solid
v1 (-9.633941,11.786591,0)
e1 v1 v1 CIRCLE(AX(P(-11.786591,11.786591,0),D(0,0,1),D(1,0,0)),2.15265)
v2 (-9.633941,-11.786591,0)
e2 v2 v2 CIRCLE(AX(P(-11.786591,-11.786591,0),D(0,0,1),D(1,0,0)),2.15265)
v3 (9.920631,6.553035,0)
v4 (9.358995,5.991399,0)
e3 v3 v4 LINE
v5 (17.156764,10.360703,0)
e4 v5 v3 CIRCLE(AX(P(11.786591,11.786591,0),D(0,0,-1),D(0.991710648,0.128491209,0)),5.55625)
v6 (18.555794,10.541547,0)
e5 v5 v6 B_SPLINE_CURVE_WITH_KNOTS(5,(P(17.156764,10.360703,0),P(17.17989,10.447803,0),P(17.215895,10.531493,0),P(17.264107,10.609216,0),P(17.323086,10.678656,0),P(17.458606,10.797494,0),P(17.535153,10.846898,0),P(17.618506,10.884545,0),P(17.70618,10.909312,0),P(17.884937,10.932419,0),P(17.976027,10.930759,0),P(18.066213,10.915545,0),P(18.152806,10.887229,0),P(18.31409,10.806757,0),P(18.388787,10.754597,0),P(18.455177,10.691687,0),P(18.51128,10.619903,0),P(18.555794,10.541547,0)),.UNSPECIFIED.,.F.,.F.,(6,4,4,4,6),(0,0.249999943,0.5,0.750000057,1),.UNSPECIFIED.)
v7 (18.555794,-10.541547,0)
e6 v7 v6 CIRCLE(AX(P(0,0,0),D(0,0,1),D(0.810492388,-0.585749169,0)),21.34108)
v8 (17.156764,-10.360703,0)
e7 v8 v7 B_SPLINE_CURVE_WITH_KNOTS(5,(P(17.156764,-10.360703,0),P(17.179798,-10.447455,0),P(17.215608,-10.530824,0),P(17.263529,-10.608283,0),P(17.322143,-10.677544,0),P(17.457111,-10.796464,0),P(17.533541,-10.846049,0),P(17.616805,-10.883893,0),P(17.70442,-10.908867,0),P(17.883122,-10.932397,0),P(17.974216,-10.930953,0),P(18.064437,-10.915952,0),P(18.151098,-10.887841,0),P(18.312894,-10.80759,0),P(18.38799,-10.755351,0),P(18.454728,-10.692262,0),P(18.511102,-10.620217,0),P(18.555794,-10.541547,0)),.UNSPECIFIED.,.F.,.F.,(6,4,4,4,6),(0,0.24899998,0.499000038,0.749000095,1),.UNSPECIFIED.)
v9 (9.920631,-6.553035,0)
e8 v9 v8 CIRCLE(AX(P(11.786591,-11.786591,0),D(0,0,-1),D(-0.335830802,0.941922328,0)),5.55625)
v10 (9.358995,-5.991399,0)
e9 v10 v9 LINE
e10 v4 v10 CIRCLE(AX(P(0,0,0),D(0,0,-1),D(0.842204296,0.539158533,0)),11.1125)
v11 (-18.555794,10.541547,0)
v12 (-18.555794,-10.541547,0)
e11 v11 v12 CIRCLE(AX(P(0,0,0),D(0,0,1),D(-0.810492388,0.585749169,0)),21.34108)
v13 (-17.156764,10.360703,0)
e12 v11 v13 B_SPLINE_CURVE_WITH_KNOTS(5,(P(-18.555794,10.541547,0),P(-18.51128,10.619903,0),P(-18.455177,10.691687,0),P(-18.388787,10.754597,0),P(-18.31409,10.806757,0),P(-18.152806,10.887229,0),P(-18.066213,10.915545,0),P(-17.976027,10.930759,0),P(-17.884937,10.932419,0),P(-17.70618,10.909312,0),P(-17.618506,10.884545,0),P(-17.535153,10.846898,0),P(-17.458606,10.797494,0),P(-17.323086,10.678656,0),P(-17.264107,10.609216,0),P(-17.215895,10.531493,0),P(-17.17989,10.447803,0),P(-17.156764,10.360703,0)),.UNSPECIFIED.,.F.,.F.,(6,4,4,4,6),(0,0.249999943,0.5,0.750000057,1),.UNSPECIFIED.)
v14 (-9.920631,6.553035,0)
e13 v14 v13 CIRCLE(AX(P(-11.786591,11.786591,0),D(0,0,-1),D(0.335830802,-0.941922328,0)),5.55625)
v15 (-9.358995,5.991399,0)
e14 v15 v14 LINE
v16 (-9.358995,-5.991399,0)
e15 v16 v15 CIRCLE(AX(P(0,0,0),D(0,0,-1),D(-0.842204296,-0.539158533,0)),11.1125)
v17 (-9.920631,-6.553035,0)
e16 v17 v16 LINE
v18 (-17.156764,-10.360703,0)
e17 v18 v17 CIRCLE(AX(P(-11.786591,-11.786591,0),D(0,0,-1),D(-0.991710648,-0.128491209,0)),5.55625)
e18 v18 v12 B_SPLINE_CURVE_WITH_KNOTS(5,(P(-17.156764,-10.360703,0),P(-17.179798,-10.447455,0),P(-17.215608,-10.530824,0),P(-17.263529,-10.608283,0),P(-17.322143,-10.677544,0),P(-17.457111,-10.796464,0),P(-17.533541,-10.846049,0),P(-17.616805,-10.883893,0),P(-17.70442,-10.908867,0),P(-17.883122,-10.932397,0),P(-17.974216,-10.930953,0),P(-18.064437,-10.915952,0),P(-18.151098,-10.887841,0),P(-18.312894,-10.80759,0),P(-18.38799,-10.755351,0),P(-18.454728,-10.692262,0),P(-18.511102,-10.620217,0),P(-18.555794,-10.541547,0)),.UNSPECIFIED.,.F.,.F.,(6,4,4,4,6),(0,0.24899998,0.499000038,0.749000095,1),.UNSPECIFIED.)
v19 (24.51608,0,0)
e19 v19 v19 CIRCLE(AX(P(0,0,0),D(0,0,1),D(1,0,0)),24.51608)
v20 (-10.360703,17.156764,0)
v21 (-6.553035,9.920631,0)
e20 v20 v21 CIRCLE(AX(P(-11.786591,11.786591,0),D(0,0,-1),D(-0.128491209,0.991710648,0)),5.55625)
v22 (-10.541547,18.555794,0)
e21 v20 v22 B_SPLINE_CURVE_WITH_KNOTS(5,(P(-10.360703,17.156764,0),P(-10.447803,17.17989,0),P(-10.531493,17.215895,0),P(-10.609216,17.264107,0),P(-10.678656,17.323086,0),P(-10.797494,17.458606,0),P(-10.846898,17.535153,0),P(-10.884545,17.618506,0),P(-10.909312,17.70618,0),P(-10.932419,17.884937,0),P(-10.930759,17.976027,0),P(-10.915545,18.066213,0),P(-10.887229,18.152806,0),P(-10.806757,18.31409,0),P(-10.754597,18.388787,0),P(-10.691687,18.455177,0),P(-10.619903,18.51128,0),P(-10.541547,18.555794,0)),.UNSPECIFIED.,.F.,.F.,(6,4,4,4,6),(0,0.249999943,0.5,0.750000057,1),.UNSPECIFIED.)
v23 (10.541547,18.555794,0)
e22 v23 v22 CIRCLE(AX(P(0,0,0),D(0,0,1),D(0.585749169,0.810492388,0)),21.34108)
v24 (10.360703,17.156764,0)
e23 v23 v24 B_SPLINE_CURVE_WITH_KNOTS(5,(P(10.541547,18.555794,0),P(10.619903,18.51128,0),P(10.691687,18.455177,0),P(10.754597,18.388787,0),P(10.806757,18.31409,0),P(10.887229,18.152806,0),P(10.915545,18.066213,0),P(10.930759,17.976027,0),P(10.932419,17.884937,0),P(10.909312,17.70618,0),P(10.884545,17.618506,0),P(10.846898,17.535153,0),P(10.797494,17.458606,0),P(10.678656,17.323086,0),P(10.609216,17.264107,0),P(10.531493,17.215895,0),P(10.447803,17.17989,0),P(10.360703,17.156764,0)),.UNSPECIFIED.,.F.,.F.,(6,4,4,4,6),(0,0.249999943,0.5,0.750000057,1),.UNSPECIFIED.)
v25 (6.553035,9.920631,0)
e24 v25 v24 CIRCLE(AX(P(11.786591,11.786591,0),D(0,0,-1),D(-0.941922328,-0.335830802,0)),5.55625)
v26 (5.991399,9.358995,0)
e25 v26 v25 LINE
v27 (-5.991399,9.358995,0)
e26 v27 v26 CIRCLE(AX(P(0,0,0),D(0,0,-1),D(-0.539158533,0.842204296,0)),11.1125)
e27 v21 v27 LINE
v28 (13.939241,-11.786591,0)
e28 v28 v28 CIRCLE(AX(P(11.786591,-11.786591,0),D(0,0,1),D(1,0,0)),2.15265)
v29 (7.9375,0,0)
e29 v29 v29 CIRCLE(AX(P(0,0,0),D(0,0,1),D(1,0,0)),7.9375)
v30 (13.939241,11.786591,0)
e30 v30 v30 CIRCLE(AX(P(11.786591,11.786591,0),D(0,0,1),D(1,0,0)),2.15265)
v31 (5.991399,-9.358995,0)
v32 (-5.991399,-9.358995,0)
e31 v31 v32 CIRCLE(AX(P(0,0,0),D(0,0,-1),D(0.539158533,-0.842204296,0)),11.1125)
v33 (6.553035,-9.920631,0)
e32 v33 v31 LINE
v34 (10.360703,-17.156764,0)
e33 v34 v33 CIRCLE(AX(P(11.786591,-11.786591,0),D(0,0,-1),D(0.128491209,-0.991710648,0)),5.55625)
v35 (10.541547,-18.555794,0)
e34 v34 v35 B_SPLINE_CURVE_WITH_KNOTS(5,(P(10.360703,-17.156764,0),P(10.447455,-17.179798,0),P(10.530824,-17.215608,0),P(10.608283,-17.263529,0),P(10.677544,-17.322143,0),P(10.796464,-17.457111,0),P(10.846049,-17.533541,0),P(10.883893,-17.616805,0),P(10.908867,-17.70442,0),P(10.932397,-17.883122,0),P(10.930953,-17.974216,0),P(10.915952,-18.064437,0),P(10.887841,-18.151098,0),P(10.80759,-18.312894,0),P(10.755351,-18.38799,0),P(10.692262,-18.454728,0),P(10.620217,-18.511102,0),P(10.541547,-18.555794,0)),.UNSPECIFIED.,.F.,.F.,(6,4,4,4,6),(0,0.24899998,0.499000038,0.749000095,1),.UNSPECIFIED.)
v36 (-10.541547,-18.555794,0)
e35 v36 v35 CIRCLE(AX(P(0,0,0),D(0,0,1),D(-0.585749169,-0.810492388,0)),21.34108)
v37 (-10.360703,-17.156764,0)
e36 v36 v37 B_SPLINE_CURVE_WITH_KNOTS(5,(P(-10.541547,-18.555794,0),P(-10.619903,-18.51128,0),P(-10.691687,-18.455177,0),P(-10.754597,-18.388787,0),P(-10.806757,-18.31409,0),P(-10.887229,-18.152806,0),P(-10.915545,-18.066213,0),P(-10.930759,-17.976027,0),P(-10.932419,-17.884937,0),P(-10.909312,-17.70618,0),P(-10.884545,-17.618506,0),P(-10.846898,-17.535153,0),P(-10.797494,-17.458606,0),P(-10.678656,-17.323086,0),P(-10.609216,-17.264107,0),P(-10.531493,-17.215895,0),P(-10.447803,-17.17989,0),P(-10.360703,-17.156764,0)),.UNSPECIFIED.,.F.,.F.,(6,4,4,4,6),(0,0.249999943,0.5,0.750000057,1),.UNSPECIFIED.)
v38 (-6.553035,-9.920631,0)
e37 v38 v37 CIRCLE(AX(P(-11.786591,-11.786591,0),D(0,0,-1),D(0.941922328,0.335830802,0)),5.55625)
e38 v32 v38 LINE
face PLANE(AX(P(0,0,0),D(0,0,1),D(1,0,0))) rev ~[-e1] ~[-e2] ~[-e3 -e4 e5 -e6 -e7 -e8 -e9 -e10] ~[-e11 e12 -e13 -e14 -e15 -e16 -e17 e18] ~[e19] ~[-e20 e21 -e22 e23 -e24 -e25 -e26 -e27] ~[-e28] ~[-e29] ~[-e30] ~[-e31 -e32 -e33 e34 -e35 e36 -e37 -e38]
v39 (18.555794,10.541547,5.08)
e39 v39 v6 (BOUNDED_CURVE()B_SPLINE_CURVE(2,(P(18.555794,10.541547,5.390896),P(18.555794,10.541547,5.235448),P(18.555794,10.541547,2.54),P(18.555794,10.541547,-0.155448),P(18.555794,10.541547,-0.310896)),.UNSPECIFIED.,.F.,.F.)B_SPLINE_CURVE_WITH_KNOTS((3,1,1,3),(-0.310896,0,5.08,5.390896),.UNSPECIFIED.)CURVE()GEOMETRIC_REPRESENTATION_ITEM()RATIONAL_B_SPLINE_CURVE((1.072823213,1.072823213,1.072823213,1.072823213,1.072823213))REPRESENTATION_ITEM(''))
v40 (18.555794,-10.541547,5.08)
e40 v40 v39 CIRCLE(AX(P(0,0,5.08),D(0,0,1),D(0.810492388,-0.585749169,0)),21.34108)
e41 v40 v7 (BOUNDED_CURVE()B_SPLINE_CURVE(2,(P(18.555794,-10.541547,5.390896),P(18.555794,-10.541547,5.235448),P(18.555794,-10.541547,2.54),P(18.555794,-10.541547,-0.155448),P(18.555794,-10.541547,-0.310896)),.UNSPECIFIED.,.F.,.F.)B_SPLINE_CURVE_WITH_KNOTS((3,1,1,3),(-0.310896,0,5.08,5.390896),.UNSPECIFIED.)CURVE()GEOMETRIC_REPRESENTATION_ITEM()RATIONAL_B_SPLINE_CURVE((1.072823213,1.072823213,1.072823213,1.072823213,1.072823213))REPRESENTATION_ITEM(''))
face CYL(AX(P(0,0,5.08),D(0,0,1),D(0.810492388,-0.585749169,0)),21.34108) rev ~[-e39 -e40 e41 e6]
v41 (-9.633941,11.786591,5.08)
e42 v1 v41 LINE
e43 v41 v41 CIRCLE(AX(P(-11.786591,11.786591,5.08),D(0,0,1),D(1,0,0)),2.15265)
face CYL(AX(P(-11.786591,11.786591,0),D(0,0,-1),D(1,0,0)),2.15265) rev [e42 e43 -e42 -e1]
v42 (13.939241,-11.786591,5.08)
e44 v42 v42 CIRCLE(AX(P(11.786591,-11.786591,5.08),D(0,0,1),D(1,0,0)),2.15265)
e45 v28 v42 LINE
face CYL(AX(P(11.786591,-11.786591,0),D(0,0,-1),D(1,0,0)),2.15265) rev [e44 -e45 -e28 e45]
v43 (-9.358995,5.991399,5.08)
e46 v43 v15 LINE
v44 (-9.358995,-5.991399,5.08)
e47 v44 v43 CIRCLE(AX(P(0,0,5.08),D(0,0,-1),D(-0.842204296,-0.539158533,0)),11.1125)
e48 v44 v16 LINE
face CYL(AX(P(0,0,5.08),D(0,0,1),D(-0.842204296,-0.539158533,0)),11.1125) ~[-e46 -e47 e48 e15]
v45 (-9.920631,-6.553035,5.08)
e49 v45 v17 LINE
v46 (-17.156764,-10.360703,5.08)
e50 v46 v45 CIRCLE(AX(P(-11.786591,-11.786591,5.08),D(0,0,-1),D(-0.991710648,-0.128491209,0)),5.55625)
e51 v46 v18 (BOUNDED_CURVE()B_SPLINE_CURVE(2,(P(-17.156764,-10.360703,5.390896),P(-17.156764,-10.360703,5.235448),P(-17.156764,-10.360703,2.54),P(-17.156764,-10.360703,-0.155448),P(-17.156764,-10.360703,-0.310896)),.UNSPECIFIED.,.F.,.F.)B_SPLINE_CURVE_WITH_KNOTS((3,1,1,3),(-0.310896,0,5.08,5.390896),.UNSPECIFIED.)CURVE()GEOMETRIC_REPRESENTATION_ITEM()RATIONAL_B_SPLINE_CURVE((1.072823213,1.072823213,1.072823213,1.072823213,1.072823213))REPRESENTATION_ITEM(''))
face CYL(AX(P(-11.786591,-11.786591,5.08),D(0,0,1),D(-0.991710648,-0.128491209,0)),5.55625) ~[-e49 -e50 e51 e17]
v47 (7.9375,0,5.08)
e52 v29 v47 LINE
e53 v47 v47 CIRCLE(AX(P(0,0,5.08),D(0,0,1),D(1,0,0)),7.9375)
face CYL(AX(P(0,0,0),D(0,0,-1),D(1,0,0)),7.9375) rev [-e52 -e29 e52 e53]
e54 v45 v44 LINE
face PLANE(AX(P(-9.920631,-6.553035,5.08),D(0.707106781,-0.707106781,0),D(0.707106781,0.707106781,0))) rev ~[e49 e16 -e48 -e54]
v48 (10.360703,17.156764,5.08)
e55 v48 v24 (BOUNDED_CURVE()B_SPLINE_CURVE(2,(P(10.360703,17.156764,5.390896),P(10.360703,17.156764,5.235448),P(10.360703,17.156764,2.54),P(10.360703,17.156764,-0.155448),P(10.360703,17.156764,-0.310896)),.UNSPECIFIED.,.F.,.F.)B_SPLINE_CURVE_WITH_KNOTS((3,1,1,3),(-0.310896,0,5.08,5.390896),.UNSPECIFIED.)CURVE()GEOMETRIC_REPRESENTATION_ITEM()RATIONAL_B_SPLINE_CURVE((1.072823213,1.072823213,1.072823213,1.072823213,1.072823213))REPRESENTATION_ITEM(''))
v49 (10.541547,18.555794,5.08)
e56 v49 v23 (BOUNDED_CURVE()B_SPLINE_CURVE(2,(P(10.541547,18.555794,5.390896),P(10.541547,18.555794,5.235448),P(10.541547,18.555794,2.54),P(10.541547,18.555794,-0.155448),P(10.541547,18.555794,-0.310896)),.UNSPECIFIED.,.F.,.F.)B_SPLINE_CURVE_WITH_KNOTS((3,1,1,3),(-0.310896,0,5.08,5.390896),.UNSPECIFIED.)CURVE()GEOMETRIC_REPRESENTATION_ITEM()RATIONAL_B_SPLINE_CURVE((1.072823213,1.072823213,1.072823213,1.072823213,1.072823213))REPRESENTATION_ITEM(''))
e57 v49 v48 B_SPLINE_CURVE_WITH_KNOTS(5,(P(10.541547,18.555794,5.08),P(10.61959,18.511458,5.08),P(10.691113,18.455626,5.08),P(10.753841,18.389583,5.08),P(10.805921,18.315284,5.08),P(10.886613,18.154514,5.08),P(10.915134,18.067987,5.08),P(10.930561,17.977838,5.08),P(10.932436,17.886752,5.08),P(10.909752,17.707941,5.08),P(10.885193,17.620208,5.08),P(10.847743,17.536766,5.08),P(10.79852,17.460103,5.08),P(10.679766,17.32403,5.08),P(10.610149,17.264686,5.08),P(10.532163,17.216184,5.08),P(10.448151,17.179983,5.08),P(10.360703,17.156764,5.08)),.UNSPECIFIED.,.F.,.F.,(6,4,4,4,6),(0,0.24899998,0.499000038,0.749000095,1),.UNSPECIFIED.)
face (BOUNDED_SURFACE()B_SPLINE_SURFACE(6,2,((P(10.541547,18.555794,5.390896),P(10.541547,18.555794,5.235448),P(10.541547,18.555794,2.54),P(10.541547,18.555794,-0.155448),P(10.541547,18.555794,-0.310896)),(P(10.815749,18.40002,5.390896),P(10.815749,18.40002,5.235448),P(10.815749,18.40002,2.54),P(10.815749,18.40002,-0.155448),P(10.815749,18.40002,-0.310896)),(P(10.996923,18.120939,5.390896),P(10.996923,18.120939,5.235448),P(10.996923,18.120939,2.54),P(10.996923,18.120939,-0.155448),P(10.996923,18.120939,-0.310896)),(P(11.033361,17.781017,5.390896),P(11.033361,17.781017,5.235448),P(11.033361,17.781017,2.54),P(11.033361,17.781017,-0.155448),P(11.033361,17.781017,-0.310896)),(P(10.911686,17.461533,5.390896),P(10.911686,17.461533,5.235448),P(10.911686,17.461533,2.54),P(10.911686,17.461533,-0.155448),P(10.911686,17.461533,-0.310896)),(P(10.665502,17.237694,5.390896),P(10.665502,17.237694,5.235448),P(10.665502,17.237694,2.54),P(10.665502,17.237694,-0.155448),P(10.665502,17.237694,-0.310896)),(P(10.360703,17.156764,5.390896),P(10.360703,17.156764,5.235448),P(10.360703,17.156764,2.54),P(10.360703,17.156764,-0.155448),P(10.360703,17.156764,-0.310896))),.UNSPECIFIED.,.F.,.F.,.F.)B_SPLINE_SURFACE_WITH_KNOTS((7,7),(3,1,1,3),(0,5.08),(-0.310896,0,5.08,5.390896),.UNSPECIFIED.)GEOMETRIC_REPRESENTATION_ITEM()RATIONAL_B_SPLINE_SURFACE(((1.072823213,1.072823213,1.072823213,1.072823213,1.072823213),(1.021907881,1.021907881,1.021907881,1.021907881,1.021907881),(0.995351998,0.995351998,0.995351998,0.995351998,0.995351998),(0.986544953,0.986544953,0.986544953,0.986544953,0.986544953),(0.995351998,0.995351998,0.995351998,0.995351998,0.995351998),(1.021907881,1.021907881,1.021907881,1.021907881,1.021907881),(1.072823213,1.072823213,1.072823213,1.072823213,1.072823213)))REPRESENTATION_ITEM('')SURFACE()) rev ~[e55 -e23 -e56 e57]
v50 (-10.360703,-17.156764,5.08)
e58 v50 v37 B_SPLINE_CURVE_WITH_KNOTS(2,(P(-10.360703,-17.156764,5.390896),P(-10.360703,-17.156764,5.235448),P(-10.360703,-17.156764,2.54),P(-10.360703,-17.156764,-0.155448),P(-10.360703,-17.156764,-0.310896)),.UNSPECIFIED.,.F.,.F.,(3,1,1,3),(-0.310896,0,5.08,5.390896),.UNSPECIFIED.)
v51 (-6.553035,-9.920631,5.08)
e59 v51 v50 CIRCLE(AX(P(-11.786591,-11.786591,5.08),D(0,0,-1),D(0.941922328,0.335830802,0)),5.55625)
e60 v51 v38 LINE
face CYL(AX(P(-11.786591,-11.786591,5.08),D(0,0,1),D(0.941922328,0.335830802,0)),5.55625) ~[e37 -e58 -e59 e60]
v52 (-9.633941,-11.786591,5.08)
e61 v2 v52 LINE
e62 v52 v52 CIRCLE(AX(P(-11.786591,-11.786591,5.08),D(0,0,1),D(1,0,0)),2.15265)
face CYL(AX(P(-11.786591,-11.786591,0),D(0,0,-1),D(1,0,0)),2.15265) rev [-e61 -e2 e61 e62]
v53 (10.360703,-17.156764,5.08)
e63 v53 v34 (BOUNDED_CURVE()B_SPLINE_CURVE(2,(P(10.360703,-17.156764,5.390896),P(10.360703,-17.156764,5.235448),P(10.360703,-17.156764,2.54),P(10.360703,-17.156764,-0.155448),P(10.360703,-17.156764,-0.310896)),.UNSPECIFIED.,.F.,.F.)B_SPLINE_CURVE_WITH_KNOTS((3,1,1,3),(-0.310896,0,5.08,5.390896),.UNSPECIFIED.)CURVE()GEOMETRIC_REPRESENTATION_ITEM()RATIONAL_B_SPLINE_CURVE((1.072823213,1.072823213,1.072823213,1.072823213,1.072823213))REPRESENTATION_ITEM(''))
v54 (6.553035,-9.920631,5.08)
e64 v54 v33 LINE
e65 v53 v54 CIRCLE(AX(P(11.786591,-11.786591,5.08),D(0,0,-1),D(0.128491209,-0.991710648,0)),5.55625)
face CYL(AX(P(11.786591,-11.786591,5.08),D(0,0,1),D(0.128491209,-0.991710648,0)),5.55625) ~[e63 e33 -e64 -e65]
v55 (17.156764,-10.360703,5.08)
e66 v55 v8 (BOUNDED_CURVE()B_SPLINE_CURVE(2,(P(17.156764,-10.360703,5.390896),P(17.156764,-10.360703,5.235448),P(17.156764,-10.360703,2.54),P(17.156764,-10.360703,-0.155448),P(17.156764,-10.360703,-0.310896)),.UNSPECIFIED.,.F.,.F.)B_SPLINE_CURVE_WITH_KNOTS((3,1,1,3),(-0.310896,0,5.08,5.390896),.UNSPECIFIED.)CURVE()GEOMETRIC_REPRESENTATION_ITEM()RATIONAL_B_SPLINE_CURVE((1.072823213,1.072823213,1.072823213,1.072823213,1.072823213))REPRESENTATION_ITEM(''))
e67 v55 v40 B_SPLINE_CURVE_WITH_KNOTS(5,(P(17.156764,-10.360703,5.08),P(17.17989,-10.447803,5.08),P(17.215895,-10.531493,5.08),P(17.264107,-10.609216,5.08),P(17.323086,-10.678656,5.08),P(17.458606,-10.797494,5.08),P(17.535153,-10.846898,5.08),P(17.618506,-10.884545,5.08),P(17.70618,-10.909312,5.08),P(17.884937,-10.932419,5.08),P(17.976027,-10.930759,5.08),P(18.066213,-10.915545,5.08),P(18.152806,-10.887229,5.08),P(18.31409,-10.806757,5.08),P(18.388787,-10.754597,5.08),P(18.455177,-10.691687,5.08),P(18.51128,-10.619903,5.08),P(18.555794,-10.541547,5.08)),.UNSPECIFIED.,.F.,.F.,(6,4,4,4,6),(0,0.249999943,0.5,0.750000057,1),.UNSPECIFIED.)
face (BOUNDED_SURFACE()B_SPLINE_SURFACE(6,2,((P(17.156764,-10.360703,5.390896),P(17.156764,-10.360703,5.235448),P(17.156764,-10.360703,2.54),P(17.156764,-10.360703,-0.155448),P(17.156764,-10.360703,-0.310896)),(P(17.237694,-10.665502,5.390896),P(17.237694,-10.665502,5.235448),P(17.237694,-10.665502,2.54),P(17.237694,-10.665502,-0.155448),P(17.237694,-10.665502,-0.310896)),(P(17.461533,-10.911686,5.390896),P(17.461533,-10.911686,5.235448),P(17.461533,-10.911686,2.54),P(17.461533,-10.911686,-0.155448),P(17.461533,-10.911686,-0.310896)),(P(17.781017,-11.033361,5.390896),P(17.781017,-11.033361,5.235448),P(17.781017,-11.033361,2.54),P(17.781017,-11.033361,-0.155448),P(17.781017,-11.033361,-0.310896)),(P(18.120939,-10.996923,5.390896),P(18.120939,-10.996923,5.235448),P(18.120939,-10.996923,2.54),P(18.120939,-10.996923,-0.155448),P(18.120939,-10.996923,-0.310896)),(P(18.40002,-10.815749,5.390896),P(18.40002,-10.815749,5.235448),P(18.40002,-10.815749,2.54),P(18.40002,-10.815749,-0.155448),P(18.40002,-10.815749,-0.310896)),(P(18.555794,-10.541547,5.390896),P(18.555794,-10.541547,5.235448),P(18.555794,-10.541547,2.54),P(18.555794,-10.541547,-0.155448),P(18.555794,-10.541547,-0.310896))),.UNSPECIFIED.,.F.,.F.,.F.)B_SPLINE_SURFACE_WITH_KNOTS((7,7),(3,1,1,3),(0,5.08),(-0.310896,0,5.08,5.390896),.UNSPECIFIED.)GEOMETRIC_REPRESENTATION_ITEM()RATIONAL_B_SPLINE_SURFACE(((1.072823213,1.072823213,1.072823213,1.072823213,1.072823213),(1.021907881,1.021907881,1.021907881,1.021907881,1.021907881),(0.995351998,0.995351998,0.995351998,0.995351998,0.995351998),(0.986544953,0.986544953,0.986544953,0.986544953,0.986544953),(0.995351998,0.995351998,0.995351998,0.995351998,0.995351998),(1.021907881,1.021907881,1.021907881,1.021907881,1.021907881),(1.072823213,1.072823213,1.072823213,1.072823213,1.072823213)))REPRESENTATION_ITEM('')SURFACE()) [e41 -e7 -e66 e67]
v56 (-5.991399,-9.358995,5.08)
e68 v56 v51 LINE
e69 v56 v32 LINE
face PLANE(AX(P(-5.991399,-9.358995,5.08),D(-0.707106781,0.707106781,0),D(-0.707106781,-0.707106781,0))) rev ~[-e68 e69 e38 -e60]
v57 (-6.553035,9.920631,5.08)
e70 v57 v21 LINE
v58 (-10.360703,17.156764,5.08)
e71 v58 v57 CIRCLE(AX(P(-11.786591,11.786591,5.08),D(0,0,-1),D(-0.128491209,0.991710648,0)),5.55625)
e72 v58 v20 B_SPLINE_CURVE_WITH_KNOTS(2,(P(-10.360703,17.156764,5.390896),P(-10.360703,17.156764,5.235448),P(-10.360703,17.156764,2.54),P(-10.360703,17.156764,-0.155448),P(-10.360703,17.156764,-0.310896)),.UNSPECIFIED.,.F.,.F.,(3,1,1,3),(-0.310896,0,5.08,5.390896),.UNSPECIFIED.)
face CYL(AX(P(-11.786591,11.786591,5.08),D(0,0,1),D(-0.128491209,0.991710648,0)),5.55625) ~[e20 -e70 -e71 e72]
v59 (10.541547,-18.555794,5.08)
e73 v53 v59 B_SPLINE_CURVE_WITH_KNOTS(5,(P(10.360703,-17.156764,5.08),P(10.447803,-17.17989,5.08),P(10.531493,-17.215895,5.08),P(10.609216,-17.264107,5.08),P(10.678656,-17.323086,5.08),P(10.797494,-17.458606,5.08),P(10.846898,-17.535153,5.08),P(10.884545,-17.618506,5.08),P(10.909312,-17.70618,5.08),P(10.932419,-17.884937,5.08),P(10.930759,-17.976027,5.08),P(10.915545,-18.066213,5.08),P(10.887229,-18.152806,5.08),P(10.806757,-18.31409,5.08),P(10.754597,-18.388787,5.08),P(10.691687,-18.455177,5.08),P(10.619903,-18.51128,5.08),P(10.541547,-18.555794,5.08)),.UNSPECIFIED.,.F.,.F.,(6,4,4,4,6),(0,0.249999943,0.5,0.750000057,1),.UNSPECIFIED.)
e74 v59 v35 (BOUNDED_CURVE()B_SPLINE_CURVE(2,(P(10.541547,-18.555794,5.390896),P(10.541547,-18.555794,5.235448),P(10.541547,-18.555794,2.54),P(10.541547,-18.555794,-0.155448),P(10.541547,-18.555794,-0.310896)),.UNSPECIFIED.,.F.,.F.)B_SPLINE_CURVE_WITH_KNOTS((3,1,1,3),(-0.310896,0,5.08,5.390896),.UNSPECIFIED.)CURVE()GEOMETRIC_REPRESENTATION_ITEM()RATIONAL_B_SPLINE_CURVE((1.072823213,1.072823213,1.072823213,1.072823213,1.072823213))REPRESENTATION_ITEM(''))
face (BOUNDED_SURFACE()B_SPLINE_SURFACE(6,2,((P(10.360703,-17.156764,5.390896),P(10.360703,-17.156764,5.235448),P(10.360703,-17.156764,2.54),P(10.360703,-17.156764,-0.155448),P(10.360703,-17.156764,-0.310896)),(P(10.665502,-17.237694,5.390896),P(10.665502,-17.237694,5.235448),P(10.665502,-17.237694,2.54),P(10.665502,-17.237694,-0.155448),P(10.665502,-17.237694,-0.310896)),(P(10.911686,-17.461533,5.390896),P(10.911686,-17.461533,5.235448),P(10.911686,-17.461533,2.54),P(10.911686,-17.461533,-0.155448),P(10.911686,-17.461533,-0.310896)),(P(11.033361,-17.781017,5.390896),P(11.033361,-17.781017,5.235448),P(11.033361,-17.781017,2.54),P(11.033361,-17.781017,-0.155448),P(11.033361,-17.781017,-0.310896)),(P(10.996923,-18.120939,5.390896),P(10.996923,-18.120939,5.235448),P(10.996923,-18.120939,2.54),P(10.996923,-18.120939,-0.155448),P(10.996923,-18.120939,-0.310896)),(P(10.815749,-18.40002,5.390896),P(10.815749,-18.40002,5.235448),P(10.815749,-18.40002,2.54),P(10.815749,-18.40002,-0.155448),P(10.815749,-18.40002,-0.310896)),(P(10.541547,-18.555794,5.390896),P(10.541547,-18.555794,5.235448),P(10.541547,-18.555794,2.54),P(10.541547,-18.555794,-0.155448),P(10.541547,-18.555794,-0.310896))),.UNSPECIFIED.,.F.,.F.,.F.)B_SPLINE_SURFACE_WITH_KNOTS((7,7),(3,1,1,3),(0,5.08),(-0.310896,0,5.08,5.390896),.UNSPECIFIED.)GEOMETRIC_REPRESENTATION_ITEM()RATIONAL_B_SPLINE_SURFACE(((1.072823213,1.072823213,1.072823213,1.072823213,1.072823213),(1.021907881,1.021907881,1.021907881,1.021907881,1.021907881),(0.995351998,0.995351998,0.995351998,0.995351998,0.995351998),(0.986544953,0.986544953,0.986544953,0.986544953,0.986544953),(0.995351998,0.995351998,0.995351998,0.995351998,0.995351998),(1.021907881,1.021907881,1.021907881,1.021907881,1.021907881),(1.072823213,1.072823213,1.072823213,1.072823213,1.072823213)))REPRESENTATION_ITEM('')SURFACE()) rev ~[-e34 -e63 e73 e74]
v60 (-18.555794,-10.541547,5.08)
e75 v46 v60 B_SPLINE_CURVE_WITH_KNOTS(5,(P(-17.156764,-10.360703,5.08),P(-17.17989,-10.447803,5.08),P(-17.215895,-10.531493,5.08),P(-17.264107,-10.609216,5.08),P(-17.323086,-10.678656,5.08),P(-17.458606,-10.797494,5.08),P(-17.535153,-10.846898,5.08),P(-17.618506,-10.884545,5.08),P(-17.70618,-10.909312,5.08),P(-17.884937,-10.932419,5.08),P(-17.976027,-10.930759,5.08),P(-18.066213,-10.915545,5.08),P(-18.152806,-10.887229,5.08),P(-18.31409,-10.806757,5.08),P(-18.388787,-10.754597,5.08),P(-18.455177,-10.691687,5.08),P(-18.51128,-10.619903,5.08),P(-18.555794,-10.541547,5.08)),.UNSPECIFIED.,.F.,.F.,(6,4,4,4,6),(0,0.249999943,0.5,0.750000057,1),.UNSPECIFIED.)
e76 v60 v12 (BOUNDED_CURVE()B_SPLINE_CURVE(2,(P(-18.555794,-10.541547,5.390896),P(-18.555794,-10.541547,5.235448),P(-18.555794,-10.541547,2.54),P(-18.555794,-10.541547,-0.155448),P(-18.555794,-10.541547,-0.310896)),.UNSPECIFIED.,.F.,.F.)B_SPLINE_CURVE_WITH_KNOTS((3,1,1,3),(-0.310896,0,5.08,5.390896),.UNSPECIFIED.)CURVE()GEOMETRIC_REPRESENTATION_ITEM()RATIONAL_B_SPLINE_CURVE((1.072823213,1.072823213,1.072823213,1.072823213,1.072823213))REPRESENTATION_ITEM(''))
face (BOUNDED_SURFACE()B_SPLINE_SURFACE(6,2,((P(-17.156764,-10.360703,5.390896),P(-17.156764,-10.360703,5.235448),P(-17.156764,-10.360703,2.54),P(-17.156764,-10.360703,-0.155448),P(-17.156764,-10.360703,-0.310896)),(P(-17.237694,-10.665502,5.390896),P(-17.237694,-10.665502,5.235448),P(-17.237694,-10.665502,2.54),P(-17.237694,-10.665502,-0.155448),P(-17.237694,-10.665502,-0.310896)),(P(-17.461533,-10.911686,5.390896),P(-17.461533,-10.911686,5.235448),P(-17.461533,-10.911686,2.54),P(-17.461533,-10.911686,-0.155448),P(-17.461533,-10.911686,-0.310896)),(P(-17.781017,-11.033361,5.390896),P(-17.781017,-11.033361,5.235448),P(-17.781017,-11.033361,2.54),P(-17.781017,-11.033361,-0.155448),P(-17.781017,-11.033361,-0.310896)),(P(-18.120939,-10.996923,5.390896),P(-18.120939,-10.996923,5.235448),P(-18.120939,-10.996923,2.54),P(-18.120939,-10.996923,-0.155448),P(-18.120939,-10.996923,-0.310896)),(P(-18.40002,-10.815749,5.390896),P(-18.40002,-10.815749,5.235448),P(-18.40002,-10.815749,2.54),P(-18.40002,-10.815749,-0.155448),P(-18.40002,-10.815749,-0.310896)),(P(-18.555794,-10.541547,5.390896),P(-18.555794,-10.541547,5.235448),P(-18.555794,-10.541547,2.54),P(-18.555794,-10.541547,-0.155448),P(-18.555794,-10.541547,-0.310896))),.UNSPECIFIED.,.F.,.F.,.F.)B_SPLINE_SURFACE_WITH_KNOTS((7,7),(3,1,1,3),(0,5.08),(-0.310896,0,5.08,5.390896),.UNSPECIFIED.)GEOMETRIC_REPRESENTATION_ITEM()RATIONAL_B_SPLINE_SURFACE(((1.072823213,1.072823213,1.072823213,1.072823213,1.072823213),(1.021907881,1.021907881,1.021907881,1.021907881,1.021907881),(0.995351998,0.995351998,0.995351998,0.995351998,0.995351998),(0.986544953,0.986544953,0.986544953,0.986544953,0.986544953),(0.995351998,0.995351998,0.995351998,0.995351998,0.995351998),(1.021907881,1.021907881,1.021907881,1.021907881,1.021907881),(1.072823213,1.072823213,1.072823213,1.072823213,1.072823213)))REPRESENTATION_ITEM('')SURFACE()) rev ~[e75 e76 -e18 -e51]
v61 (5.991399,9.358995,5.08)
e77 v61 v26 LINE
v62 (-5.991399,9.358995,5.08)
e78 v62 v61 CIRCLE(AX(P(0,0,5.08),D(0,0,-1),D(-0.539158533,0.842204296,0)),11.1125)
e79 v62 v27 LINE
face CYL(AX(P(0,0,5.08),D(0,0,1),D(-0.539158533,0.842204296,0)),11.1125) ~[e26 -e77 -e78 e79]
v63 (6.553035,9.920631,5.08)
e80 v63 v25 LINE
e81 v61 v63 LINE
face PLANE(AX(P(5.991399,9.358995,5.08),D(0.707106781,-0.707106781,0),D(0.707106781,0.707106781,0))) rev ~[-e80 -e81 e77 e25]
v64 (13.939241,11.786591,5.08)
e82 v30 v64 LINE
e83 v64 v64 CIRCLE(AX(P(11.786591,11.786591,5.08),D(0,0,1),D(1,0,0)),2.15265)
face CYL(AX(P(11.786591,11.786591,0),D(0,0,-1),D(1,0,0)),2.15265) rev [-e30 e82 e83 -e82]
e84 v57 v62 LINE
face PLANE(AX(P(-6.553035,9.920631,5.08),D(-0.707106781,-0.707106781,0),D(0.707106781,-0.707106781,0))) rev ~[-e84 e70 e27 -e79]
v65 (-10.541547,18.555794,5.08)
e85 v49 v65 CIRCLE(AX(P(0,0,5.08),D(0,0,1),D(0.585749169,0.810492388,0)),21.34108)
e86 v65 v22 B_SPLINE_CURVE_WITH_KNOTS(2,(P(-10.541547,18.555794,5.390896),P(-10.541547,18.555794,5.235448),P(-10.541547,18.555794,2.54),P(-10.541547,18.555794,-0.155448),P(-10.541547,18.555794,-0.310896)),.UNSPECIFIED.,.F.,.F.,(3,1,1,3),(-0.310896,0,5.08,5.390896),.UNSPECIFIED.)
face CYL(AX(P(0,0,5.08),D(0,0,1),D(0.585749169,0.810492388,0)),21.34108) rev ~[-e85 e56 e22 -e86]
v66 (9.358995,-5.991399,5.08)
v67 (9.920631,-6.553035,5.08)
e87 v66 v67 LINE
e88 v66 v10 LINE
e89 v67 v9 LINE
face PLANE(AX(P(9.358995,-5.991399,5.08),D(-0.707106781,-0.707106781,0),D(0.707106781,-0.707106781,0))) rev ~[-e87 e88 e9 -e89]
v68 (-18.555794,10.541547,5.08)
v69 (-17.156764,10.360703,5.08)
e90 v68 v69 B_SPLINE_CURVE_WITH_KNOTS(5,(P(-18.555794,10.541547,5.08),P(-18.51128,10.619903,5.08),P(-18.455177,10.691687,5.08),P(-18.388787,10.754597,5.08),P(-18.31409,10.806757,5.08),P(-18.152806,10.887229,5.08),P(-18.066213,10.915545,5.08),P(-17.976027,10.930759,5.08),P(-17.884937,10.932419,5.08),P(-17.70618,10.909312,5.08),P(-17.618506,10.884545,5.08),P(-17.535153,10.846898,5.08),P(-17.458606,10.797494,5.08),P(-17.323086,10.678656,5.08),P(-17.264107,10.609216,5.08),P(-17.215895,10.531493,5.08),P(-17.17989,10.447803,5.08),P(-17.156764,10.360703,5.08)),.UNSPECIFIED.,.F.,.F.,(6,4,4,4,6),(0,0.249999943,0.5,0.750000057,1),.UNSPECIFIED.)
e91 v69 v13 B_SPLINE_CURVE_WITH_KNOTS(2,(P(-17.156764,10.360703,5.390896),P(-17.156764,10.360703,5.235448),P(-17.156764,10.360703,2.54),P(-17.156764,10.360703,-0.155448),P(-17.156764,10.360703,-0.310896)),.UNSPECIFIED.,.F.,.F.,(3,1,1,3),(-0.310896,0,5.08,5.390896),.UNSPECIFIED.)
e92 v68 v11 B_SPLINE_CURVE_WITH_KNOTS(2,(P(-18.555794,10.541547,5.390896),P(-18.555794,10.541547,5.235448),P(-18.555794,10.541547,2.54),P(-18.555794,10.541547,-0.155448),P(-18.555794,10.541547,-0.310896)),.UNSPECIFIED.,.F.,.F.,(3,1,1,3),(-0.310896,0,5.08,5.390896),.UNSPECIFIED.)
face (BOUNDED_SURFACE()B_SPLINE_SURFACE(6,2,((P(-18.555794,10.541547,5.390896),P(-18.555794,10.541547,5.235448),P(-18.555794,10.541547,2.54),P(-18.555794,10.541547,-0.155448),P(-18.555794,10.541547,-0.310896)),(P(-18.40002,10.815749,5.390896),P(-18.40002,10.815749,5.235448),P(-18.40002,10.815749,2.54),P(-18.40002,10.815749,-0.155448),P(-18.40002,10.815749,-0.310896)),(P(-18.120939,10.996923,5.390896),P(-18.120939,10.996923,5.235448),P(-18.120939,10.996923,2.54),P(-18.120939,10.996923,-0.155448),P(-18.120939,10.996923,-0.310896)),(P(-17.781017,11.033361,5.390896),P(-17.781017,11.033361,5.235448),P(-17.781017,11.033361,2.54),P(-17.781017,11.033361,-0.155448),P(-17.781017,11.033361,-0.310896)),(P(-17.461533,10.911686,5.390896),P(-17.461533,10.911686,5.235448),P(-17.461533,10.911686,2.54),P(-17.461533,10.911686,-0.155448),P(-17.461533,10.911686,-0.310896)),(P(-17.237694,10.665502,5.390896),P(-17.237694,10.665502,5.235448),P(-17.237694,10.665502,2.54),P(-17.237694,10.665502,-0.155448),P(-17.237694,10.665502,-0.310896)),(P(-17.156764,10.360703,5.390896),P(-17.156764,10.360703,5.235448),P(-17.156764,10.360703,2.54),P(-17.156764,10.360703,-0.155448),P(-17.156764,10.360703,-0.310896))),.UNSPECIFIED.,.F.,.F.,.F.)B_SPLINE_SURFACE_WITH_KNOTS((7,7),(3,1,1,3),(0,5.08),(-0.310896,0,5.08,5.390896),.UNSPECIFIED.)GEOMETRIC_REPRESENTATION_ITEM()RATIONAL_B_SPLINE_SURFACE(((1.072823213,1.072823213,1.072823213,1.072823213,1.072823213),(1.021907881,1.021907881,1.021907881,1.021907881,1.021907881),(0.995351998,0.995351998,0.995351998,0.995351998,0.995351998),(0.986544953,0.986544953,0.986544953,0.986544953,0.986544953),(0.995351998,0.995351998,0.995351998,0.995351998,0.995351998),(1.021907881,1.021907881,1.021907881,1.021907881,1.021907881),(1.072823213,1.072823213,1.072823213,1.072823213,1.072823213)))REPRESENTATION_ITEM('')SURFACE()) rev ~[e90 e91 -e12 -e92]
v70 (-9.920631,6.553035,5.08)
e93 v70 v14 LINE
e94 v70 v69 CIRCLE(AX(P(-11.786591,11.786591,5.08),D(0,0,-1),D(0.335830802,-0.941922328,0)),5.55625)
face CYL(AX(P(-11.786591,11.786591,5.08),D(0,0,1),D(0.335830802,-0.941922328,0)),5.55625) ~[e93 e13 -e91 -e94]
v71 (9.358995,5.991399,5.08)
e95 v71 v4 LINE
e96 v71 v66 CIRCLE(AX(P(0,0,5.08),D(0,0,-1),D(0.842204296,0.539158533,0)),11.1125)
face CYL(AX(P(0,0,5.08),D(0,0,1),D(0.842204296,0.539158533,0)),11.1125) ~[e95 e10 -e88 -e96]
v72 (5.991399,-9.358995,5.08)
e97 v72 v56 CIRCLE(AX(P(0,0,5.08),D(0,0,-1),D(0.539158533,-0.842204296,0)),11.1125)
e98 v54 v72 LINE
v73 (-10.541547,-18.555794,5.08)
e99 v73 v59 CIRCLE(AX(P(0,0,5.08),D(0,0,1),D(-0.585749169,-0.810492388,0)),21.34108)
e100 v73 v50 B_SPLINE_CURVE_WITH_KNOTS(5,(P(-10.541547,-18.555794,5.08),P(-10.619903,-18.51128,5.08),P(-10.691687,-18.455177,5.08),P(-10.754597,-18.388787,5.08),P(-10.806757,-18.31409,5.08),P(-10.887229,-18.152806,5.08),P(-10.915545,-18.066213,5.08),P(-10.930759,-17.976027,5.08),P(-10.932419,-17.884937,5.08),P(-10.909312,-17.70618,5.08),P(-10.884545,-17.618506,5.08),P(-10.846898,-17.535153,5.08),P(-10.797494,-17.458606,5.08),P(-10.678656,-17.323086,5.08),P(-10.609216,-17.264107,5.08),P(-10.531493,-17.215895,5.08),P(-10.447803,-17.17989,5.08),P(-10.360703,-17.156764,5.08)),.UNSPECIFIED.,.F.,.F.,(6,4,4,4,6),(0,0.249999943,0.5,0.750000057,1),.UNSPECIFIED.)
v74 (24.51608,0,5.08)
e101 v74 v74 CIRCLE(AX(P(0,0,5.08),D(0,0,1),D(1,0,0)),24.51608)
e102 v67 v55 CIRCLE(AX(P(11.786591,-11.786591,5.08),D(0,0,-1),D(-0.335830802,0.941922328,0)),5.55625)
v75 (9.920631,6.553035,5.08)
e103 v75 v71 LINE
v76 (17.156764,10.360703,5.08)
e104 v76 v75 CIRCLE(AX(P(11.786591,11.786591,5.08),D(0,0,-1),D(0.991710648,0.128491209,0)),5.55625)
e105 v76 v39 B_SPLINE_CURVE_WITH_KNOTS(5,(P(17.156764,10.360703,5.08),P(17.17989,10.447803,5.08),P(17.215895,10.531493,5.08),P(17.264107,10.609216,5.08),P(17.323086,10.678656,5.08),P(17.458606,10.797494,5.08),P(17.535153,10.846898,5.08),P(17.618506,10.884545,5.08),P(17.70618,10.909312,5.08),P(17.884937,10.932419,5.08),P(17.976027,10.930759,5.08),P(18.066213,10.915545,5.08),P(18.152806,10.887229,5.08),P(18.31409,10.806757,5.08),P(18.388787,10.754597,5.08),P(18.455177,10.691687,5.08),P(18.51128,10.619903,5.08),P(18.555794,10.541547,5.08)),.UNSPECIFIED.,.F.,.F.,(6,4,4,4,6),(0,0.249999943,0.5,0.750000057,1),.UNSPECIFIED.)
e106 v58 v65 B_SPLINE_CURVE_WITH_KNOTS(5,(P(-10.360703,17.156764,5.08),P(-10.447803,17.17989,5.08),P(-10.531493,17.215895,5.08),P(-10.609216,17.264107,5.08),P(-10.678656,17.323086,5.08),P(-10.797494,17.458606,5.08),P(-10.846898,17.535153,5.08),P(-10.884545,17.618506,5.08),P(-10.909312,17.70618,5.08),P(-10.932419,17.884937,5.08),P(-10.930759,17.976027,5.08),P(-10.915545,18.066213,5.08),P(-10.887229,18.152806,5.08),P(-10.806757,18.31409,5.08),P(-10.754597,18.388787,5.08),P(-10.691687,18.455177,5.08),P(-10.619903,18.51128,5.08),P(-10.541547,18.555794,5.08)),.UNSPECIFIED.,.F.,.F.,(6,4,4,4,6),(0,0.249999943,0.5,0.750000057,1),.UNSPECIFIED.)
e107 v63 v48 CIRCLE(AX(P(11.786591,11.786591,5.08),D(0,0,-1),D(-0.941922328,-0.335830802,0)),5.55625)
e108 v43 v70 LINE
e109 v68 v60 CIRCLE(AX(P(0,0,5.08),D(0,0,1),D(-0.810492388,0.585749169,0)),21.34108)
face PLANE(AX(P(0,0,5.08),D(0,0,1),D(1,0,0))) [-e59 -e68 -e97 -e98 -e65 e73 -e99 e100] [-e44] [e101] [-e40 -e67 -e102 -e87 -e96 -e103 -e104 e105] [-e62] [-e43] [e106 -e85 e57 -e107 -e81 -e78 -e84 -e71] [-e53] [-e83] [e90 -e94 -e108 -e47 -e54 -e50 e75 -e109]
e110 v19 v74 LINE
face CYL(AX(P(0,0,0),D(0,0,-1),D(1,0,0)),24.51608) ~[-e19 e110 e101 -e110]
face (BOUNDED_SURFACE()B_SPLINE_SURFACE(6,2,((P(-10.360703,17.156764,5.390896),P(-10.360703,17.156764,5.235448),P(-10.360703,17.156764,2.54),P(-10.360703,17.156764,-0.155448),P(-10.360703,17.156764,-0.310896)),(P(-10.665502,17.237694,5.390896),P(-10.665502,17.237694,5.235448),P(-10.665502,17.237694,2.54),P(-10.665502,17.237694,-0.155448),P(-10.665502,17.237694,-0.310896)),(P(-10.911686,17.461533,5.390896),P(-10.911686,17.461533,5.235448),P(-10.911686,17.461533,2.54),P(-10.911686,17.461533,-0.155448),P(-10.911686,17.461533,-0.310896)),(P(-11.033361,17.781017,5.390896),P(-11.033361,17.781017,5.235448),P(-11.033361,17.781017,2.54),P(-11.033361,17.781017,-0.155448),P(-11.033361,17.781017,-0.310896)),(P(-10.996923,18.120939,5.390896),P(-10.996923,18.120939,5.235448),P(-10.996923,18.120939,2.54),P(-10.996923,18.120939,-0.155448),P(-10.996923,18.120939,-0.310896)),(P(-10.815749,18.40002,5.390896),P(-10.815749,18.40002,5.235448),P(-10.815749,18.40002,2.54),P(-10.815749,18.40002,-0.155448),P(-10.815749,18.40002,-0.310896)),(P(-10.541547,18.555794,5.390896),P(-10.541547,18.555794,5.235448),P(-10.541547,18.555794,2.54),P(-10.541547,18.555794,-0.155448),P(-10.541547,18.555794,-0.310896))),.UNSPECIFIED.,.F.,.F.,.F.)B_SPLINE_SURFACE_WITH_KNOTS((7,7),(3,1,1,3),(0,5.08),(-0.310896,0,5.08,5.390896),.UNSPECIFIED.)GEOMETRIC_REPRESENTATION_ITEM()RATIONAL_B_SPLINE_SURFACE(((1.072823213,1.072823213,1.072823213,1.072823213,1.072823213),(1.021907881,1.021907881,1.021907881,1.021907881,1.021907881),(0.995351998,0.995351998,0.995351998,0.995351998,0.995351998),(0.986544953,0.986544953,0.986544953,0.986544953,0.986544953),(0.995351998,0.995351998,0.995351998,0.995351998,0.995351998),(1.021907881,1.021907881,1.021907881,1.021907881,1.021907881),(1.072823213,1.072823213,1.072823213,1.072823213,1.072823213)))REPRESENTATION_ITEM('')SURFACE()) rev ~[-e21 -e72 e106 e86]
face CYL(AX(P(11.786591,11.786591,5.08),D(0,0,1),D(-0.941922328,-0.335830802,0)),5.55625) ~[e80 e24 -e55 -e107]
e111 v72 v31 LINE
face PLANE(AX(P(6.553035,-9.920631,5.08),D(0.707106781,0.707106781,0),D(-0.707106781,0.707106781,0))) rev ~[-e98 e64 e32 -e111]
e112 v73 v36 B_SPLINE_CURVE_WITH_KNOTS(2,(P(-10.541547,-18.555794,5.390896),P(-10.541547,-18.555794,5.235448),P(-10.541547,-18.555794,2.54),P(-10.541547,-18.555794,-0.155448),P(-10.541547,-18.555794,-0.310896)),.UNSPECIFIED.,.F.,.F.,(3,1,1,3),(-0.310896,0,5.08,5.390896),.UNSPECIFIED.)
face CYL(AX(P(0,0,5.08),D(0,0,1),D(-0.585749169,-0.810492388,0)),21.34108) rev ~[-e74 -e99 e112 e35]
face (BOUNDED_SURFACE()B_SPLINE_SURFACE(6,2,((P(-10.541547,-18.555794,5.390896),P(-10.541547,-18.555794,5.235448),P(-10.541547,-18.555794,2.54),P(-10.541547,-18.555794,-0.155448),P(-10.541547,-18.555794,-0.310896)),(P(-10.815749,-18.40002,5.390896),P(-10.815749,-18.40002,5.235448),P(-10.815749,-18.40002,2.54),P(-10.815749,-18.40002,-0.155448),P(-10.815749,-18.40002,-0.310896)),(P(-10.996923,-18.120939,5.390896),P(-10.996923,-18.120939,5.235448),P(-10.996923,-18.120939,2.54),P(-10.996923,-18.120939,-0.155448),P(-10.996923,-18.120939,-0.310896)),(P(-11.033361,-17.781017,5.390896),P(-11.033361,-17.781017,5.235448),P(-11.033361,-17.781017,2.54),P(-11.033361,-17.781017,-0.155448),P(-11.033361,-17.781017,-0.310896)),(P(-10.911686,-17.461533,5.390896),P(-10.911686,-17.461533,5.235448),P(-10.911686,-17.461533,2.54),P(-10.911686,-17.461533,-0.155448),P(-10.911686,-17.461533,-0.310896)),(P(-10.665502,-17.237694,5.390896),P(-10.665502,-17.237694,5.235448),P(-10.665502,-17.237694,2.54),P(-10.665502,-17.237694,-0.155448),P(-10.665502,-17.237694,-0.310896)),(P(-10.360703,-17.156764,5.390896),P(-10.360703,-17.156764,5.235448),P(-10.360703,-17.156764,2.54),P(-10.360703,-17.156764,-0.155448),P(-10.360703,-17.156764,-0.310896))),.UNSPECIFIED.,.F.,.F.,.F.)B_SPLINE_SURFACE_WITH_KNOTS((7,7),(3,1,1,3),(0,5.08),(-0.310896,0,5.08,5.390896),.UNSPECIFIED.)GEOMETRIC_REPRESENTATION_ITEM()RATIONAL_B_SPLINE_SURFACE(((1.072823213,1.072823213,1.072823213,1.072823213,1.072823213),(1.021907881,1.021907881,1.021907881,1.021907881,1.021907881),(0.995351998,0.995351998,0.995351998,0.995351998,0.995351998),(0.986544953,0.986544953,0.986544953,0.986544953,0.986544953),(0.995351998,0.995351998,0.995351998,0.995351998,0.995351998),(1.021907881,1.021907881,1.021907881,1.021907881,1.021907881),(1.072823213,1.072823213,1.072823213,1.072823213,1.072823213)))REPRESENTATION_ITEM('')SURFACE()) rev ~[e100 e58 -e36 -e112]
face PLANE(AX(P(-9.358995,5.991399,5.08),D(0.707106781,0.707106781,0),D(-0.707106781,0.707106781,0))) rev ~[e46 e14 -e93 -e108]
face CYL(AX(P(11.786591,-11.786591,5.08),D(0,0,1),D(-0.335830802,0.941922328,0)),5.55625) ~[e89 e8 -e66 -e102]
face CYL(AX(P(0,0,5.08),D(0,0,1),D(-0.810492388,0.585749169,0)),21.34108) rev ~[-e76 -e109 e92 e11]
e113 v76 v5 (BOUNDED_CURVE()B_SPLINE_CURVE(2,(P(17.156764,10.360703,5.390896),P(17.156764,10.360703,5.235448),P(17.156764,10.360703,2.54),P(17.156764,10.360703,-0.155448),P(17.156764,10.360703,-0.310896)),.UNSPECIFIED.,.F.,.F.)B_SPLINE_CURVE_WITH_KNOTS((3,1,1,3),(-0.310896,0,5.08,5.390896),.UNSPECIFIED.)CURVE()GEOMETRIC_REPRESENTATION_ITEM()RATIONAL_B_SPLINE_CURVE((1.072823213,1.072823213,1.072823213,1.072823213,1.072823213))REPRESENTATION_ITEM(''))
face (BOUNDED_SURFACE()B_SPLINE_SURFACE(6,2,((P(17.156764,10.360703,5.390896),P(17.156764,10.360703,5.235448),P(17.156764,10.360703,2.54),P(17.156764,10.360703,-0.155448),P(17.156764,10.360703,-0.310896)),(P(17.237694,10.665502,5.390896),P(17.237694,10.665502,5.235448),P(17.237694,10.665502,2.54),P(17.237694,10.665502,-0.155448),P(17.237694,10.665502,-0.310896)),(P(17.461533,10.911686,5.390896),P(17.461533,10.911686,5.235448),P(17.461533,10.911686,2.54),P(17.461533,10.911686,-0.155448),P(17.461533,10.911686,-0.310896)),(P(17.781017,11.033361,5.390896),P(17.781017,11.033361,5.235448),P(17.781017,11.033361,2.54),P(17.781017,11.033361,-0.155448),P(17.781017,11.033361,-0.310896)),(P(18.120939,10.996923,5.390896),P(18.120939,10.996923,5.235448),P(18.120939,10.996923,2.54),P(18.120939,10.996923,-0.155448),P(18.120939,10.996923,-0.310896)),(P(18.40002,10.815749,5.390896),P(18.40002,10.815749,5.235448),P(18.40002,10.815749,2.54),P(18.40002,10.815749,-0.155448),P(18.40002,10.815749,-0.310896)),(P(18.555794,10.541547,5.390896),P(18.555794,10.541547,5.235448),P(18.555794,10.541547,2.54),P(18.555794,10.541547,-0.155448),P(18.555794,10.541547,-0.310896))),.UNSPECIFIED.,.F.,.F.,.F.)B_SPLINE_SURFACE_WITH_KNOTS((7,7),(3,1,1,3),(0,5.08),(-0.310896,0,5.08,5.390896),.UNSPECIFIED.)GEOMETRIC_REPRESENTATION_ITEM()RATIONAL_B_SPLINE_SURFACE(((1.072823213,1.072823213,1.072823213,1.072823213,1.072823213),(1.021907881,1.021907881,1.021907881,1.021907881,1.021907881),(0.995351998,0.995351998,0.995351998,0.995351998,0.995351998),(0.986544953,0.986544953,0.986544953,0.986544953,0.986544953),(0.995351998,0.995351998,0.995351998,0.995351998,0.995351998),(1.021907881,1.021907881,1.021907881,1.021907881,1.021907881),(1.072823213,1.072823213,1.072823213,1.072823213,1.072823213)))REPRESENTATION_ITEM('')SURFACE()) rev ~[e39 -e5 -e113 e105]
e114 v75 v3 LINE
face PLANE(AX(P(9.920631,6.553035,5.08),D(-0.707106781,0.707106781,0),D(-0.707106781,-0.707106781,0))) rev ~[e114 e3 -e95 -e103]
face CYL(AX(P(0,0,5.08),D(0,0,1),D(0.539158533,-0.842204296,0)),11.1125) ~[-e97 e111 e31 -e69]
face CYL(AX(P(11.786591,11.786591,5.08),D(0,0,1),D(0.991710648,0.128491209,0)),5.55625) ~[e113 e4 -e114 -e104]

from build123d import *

# Parameters (mm, degrees)
F0_R            = 24.51608
F0_R_2          = 2.15265
F0_R_3          = 7.9375
F1_DEPTH        = 5.08
F3_DEPTH        = 5.08
F3_COPIES_COUNT = 4
F4_R            = 0.762


# Not quite as in the source:
# - a pattern or mirror of a feature is missing from the dataset's text; its kind, count and spacing are read off the source's solid


with BuildPart() as f1:
    # F0 (on Top) → F1 (new body)
    with BuildSketch(Plane.XY):
        Circle(F0_R)
        with Locations((-11.7865906, -11.7865906)):
            Circle(F0_R_2, mode=Mode.SUBTRACT)
        with Locations((11.7865906, -11.7865906)):
            Circle(F0_R_2, mode=Mode.SUBTRACT)
        with Locations((-11.7865906, 11.7865906)):
            Circle(F0_R_2, mode=Mode.SUBTRACT)
        Circle(F0_R_3, mode=Mode.SUBTRACT)
        with Locations((11.7865906, 11.7865906)):
            Circle(F0_R_2, mode=Mode.SUBTRACT)
    extrude(amount=F1_DEPTH)

    # F2 (on face) → F3 (cut, through all)
    with BuildSketch(Plane.XY.offset(5.08)):
        with BuildLine():
            ThreePointArc((-12.5005198818, 17.2967828873), (-7.4612395718, 15.2741760893), (-6.553034663, 9.9206307084))
            Line((-6.553034663, 9.9206307084), (-5.9913991959, 9.3589952413))
            ThreePointArc((-5.9913991959, 9.3589952413), (0, 11.1125), (5.9913991959, 9.3589952413))
            Line((5.9913991959, 9.3589952413), (6.553034663, 9.9206307084))
            ThreePointArc((6.553034663, 9.9206307084), (7.4612395718, 15.2741760893), (12.5005198818, 17.2967828873))
            ThreePointArc((12.5005198818, 17.2967828873), (0, 21.34108), (-12.5005198818, 17.2967828873))
        make_face()
    f3 = extrude(amount=-F3_DEPTH, mode=Mode.SUBTRACT)

    # F3_copies: F3 ×4 about axis
    f3_copies_axis = Axis((0, 0, 0), (0, 0, 1))
    for i in range(1, F3_COPIES_COUNT):
        add(f3.rotate(f3_copies_axis, i * 360 / F3_COPIES_COUNT), mode=Mode.SUBTRACT)

    # F4
    f4_edges = [f1.edges().sort_by_distance(p)[0] for p in [
        (-12.50052, 17.296783, 2.54),
        (12.50052, 17.296783, 2.54),
        (-17.296783, -12.50052, 2.54),
        (-17.296783, 12.50052, 2.54),
        (12.50052, -17.296783, 2.54),
        (-12.50052, -17.296783, 2.54),
        (17.296783, 12.50052, 2.54),
        (17.296783, -12.50052, 2.54),
    ]]
    fillet(f4_edges, radius=F4_R)


solid = f1.part
